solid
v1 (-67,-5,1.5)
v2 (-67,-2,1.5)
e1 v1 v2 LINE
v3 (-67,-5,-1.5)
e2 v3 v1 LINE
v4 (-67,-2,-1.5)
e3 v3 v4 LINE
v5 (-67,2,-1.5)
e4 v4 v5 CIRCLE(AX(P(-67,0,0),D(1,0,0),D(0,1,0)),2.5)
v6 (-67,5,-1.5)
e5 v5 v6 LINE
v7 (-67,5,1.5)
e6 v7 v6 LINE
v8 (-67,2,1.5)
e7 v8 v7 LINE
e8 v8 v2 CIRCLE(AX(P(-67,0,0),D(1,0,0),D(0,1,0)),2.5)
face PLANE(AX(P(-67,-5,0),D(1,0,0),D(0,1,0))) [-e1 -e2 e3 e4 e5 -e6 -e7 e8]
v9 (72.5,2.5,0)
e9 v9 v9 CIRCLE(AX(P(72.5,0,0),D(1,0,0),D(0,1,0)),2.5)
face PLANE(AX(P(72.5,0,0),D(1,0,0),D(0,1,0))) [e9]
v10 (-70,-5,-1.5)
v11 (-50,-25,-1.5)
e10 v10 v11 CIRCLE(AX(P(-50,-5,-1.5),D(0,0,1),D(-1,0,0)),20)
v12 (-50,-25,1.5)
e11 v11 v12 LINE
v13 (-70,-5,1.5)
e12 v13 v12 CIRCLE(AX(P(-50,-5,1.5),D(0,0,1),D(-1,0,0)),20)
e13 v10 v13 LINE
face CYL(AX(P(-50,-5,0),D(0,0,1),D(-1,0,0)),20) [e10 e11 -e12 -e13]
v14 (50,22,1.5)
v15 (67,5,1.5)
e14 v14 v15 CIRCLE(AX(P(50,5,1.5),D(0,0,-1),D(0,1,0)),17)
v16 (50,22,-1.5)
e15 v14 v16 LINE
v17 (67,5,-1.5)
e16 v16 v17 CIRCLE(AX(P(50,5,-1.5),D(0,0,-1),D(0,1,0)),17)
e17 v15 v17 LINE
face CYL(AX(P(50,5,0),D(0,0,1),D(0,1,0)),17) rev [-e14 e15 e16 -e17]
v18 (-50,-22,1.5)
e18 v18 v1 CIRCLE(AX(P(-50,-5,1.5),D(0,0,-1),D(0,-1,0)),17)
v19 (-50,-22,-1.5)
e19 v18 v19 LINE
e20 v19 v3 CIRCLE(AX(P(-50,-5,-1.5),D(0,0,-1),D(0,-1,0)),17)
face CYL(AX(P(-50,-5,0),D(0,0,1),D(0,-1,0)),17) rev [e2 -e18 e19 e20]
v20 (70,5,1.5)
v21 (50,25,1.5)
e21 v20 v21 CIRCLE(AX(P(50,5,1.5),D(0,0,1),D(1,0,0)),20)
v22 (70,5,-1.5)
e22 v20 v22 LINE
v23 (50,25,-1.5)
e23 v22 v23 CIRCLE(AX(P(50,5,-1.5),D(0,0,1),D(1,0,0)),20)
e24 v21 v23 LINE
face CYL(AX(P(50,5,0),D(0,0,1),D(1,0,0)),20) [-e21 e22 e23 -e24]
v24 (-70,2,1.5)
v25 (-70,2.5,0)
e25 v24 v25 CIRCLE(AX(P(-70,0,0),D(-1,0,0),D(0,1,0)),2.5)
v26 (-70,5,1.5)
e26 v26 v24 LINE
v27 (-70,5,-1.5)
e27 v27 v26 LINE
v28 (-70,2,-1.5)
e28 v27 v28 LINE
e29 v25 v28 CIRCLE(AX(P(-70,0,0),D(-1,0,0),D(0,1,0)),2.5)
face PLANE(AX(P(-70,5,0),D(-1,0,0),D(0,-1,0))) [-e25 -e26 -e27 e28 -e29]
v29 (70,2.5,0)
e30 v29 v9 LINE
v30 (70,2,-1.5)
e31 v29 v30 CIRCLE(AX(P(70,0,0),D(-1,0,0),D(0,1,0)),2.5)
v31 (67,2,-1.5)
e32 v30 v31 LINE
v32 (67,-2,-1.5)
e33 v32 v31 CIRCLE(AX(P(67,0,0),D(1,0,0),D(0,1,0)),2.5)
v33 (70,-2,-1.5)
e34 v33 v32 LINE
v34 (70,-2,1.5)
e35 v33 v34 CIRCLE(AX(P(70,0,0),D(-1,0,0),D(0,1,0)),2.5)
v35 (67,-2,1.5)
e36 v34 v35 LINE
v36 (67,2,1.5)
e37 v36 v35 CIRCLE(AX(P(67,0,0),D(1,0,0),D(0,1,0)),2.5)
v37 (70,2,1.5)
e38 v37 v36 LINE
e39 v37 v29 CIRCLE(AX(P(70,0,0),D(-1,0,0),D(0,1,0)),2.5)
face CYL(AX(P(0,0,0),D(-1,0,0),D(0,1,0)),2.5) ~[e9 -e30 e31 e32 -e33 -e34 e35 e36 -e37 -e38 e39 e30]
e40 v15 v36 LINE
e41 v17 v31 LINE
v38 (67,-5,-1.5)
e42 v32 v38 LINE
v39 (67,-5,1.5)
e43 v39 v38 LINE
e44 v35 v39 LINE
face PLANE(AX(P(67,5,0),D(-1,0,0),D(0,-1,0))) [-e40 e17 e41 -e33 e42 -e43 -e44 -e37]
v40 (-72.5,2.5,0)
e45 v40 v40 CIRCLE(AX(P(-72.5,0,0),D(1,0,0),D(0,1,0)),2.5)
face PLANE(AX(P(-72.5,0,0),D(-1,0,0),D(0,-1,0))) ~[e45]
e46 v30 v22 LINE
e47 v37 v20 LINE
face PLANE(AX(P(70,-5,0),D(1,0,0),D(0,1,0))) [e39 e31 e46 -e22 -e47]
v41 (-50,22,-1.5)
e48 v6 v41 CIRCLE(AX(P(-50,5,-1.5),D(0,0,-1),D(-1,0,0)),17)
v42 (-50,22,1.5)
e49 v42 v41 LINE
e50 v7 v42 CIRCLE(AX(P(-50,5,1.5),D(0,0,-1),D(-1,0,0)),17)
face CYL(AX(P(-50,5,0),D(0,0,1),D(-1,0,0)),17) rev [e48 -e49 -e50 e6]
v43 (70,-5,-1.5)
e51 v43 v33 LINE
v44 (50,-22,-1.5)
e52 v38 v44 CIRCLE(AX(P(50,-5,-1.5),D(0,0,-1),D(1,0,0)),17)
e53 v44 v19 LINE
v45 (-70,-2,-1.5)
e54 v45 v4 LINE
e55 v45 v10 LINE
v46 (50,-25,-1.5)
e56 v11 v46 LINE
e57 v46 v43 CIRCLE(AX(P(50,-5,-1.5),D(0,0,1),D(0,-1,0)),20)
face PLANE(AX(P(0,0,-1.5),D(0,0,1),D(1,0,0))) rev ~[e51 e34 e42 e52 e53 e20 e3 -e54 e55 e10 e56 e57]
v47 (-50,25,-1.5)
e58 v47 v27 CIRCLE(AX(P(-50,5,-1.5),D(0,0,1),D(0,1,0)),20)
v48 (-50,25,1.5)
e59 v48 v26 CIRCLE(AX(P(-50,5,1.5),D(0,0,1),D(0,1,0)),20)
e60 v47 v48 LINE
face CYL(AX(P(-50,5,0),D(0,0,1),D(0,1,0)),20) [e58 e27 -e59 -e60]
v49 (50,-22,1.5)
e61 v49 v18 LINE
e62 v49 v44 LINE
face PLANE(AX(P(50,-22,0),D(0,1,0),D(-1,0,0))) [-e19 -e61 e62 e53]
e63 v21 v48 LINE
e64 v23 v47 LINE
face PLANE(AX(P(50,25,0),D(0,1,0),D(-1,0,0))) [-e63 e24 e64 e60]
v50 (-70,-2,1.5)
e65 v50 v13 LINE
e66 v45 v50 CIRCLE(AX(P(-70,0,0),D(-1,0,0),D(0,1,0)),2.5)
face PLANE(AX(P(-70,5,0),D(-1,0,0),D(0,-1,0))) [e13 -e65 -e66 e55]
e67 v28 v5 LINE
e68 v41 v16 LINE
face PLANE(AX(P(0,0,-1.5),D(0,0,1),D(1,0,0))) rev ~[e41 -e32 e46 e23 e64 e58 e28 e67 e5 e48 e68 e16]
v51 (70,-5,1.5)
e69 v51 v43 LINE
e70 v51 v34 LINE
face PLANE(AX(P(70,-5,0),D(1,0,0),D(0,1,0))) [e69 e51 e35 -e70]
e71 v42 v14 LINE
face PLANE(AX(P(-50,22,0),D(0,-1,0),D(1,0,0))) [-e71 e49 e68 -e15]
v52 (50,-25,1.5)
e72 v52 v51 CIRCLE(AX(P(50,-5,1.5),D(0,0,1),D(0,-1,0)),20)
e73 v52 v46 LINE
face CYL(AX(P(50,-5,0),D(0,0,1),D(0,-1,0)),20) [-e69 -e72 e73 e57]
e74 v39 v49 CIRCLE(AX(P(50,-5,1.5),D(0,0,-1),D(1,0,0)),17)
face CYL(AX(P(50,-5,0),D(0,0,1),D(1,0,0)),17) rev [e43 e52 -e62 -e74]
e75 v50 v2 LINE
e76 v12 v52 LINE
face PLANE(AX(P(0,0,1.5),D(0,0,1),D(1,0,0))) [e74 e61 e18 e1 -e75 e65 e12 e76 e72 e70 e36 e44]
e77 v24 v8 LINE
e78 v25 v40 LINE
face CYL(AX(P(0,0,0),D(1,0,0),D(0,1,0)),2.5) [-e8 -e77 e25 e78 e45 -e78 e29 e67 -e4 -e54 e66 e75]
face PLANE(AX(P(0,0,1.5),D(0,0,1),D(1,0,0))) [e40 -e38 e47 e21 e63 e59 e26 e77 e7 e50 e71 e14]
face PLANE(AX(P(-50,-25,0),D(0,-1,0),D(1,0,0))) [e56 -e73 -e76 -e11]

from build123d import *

# Parameters (mm, degrees)
F1_DEPTH = 1.5
F2_R     = 2.5
F3_DEPTH = 72.5
F4_DEPTH = 67


with BuildPart() as f1:
    # F0 (on Top) → F1 (new body, symmetric)
    with BuildSketch(Plane.XY):
        with BuildLine():
            Line((50, 25), (-50, 25))
            ThreePointArc((-50, 25), (-64.1421356237, 19.1421356237), (-70, 5))
            Line((-70, 5), (-70, -5))
            ThreePointArc((-70, -5), (-64.1421356237, -19.1421356237), (-50, -25))
            Line((-50, -25), (50, -25))
            ThreePointArc((50, -25), (64.1421356237, -19.1421356237), (70, -5))
            Line((70, -5), (70, 5))
            ThreePointArc((70, 5), (64.1421356237, 19.1421356237), (50, 25))
        make_face()
        with BuildLine():
            Line((-67, -5), (-67, 5))
            ThreePointArc((-67, 5), (-62.0208152802, 17.0208152802), (-50, 22))
            Line((-50, 22), (50, 22))
            ThreePointArc((50, 22), (62.0208152802, 17.0208152802), (67, 5))
            Line((67, 5), (67, -5))
            ThreePointArc((67, -5), (62.0208152802, -17.0208152802), (50, -22))
            Line((50, -22), (-50, -22))
            ThreePointArc((-50, -22), (-62.0208152802, -17.0208152802), (-67, -5))
        make_face(mode=Mode.SUBTRACT)
    extrude(amount=F1_DEPTH, both=True)

    # F2 (on Right) → F3 (join)
    with BuildSketch(Plane.YZ):
        Circle(F2_R)
    extrude(amount=F3_DEPTH)

    # F2 (on Right) → F4 (cut, through all)
    with BuildSketch(Plane.YZ):
        Circle(F2_R)
    extrude(amount=F4_DEPTH, mode=Mode.SUBTRACT)

    # F5: F1 across plane


with BuildPart() as f1_1:
    add(f1.part)
    add(f1.part.mirror(Plane.YZ))


solid = f1_1.part
